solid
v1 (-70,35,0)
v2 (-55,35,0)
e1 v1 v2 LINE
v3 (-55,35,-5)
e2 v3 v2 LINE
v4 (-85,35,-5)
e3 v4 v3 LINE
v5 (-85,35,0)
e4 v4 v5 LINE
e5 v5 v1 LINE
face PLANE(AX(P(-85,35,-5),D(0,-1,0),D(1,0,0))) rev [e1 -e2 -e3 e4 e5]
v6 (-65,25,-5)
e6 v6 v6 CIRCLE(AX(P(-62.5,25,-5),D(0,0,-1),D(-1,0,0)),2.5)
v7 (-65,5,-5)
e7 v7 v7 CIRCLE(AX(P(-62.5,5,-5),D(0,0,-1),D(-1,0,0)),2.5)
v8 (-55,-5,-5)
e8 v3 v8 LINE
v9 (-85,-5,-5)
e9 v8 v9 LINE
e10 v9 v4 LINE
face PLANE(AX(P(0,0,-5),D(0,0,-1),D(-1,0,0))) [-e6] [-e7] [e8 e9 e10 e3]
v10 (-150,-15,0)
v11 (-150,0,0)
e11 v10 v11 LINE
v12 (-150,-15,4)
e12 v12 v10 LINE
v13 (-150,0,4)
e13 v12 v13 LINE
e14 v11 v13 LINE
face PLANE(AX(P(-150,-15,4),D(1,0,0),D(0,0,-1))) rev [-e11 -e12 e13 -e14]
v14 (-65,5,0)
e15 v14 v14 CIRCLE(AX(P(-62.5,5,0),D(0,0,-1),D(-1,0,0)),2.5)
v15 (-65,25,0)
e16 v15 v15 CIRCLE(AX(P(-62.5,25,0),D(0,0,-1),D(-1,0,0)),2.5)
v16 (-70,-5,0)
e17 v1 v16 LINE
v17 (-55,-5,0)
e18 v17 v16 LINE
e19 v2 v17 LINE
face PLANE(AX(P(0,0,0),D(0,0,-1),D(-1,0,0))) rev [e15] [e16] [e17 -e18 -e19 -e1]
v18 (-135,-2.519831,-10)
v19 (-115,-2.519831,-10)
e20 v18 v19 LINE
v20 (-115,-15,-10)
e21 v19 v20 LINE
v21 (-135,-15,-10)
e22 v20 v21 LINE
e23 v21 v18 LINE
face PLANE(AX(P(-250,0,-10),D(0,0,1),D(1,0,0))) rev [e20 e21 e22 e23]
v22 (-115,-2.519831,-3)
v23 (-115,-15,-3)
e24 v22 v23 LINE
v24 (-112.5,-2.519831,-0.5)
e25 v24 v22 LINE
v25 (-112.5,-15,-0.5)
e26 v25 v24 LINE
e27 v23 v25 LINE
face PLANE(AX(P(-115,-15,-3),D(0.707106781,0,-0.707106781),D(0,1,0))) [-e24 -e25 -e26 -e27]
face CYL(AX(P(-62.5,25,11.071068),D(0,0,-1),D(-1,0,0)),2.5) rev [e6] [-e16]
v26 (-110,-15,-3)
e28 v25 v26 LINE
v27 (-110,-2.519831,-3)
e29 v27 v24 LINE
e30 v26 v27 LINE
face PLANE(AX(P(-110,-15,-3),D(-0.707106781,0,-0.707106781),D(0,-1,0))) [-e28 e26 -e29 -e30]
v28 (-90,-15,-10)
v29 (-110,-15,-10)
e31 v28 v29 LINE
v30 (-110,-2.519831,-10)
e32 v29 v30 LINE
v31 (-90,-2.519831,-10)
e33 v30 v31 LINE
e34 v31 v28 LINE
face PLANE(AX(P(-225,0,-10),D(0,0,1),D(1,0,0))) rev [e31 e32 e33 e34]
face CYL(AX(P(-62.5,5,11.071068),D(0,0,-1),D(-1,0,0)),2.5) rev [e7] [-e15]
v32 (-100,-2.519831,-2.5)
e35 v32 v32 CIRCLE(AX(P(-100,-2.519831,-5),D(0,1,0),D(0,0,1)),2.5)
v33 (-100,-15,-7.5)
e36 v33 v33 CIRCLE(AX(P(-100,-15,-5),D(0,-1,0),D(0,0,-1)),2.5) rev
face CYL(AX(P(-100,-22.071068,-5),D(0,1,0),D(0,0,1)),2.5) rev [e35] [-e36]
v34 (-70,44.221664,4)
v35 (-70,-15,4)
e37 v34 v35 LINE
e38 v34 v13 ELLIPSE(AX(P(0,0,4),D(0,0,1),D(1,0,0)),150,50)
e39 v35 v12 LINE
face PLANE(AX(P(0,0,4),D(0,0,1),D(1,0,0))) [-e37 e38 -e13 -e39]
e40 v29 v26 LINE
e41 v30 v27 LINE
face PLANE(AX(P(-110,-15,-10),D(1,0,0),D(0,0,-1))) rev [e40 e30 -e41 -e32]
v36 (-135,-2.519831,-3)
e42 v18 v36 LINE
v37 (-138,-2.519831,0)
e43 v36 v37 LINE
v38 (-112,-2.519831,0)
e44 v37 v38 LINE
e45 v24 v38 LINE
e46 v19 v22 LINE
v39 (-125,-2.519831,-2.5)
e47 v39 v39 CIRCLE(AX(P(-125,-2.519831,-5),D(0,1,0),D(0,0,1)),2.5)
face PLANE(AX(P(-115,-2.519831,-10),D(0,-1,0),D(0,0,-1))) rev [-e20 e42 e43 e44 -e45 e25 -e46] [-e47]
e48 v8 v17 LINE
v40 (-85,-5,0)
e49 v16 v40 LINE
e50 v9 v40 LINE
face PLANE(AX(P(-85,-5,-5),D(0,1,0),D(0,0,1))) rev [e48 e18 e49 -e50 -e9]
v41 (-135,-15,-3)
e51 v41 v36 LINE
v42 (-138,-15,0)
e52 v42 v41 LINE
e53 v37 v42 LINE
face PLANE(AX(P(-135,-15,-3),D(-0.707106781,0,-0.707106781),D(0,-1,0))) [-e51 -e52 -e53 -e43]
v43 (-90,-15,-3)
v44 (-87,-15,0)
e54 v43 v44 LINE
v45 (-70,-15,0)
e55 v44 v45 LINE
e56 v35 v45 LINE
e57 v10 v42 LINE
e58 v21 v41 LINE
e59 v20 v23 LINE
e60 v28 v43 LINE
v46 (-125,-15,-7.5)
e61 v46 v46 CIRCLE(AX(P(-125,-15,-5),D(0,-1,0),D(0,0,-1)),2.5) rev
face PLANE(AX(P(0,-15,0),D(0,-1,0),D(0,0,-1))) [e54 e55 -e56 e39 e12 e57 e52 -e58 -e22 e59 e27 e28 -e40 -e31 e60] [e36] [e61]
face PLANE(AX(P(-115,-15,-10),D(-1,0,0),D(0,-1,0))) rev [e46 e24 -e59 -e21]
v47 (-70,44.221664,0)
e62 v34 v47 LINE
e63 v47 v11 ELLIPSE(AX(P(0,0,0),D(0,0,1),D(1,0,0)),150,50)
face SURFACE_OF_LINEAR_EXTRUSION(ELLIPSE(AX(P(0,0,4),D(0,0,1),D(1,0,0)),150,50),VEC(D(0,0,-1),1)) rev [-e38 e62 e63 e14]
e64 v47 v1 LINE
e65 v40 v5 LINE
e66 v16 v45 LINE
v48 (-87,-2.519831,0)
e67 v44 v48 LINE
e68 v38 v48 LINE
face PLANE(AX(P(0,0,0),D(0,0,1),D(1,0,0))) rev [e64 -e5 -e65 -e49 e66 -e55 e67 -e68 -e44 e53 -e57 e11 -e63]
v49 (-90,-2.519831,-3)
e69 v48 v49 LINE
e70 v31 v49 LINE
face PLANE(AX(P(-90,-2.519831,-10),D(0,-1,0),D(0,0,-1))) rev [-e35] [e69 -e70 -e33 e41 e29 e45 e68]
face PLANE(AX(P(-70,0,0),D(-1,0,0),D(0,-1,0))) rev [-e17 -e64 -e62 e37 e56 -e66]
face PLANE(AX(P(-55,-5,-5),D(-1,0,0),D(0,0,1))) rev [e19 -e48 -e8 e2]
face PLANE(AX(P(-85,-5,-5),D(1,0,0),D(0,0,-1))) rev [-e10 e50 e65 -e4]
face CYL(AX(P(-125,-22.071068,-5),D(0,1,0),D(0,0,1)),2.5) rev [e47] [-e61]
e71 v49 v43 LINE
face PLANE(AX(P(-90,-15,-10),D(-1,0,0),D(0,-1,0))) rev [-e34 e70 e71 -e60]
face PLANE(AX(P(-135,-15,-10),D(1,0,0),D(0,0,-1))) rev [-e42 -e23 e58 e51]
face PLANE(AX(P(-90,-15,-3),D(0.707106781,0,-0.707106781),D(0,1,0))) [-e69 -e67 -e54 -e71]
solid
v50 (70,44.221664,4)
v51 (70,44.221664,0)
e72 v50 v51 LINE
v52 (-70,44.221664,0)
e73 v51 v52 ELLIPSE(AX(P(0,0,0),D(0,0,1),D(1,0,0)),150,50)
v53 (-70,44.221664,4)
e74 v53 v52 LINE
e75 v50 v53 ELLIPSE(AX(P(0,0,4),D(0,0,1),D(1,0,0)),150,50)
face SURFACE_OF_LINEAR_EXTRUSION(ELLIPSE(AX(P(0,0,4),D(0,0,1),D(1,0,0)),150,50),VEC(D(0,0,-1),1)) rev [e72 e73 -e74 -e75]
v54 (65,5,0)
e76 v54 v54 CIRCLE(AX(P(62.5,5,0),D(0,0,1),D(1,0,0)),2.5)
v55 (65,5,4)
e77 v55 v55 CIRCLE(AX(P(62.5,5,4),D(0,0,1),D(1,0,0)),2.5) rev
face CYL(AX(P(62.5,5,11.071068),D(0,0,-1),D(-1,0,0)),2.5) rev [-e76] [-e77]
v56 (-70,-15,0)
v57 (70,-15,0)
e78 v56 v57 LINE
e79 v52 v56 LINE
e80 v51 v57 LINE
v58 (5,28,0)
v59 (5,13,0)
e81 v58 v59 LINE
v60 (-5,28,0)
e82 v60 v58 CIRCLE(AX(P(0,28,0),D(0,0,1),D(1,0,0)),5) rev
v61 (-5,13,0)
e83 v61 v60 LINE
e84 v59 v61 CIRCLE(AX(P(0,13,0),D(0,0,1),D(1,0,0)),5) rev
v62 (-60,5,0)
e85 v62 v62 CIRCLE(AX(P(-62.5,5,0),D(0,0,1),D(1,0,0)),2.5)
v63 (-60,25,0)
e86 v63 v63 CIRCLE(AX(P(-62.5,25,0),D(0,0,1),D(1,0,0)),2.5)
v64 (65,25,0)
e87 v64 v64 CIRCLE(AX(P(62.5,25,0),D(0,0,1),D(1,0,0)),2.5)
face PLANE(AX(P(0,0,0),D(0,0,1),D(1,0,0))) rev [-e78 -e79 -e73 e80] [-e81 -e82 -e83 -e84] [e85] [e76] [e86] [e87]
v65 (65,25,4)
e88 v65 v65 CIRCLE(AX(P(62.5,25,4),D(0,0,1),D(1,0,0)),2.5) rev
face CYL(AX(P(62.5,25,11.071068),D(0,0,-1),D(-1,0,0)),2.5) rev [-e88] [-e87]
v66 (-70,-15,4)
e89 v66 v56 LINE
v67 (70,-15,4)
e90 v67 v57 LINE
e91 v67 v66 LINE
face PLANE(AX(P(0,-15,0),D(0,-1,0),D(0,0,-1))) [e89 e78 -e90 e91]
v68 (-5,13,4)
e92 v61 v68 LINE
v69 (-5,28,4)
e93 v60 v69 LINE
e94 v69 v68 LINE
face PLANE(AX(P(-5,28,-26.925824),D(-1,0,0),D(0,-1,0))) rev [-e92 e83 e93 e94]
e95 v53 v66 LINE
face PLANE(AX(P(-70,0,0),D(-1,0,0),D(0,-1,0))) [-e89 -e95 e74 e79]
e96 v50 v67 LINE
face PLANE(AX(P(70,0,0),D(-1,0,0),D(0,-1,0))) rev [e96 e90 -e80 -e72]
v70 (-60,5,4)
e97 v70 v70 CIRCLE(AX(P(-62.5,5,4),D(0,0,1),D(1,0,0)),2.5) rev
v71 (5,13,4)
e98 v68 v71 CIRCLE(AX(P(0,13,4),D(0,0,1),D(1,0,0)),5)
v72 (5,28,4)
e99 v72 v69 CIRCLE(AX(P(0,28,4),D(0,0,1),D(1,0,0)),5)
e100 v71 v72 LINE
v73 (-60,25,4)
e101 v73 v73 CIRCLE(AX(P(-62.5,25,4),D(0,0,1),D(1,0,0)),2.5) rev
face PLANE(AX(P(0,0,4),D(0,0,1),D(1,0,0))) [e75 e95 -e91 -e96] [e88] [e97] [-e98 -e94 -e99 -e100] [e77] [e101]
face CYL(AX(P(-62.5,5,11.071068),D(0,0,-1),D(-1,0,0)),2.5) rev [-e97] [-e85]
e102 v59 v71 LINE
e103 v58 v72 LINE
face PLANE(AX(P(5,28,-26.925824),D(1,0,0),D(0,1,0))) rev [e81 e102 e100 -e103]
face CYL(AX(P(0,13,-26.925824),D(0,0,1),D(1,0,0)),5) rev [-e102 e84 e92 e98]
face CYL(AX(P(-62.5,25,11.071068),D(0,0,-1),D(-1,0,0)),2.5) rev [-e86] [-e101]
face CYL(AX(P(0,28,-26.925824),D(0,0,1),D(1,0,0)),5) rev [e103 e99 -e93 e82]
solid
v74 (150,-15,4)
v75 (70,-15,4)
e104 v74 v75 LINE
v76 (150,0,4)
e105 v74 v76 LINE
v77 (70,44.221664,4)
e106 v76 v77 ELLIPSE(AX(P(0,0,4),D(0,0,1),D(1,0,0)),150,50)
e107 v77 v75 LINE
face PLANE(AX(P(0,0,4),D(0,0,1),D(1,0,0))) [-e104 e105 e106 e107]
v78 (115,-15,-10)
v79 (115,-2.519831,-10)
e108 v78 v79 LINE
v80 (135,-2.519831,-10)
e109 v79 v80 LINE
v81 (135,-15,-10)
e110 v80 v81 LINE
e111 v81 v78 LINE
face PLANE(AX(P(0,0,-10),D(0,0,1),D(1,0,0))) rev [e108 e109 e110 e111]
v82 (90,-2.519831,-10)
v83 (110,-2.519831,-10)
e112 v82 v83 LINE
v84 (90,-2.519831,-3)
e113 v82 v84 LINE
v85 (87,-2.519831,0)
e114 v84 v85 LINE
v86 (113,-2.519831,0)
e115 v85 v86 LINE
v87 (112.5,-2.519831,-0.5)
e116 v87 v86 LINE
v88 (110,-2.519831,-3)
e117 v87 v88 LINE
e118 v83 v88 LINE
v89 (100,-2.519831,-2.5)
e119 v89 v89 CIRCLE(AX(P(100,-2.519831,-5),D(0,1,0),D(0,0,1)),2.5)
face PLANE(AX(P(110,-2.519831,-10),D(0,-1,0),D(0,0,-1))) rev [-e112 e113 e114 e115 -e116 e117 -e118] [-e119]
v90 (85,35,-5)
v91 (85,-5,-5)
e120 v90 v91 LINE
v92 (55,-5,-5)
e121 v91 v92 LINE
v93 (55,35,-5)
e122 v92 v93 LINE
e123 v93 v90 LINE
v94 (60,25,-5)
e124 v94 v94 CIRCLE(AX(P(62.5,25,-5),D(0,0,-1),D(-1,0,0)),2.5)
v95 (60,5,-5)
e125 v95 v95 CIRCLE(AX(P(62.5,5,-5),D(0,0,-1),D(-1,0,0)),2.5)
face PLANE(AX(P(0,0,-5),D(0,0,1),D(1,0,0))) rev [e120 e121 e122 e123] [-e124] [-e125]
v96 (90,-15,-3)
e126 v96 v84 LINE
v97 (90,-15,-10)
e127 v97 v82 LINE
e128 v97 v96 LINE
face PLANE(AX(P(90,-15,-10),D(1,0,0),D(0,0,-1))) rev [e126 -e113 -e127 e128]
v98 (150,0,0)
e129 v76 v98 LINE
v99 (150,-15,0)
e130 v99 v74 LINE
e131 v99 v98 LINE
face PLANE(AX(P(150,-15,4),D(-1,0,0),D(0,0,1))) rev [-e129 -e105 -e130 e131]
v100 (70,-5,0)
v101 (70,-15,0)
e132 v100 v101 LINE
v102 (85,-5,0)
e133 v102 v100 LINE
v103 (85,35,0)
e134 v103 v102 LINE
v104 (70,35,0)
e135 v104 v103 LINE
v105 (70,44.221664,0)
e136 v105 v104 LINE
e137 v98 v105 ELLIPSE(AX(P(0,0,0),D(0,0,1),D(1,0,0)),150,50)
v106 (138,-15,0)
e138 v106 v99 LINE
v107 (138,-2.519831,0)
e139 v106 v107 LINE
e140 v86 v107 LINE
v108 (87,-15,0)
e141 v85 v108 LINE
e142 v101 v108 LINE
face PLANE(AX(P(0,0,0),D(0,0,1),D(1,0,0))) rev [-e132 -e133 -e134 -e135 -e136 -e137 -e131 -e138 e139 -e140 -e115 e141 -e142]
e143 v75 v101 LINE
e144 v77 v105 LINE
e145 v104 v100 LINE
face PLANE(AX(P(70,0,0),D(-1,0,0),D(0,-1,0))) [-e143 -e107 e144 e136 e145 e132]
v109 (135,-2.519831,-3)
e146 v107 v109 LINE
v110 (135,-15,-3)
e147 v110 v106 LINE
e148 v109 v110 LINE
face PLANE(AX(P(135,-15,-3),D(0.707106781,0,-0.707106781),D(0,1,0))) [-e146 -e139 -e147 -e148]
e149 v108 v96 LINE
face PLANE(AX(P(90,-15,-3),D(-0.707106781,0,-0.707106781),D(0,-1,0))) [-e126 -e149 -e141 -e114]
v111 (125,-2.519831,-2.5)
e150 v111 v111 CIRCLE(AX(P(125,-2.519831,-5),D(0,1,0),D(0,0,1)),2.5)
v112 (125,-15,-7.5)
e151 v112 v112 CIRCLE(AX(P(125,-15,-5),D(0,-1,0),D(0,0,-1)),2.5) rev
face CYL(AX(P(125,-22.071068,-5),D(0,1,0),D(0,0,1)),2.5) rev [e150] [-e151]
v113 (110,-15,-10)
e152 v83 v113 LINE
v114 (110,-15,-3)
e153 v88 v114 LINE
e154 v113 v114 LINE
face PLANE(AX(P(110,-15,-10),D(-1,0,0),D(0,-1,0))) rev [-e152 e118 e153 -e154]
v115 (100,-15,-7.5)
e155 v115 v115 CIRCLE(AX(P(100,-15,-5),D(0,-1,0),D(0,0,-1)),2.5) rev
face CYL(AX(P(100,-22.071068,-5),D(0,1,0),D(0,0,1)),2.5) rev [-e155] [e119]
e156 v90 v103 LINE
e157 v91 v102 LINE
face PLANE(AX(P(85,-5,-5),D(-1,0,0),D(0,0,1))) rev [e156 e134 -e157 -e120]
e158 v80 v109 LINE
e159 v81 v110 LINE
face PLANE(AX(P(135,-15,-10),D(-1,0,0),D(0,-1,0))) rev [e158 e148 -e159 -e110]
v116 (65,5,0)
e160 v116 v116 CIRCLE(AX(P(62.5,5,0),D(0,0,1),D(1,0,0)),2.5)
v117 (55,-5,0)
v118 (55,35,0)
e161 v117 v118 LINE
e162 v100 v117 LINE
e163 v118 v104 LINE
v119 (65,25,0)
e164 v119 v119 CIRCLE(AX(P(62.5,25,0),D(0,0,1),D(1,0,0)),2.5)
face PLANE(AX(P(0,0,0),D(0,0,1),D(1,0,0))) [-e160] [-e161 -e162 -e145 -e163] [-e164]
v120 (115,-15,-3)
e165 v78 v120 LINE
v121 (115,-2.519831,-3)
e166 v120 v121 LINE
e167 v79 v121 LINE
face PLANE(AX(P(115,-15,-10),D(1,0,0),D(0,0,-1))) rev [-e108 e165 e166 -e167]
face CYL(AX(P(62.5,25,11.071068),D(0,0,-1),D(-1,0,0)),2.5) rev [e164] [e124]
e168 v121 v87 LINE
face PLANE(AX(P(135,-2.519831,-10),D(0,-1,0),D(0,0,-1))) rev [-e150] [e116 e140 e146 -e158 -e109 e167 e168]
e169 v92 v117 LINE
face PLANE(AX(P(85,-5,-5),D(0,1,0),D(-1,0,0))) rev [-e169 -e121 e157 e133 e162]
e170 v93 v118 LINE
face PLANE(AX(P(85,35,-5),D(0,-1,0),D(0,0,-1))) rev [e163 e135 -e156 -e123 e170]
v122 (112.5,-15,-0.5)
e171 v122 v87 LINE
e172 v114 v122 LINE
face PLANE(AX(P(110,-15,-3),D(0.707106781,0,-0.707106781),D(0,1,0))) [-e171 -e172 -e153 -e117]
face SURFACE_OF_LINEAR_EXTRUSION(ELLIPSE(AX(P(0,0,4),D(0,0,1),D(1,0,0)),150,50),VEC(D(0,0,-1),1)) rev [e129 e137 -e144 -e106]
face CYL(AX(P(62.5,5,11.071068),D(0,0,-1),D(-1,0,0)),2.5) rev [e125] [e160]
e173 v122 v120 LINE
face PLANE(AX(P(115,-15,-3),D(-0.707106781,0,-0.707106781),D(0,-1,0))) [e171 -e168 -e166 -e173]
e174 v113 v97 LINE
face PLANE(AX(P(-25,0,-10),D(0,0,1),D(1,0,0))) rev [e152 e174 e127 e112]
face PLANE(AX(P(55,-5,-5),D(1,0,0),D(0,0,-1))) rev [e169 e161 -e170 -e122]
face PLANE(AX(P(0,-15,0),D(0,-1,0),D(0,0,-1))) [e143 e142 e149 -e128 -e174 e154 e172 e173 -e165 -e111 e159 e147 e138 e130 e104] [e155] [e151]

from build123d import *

# Parameters (mm, degrees)
ESQUISSE1_RX                   = 150
ESQUISSE1_RY                   = 50
BOSS_EXTRU_2_DEPTH             = 4
ESQUISSE2_W                    = 328.393114187
ESQUISSE2_H                    = 54.583456932
ENL_V_MAT_EXTRU_1_DEPTH        = 4
ENL_V_MAT_EXTRU_2_DEPTH        = 4
ESQUISSE5_W                    = 300
ESQUISSE5_H                    = 4
BOSS_EXTRU_3_DEPTH             = 15
ESQUISSE8_W                    = 20
ESQUISSE8_H                    = 12.480168935
BOSS_EXTRU_5_DEPTH             = 10
ESQUISSE9_R                    = 2.5
ENL_V_MAT_EXTRU_4_DEPTH        = 12.480168935
CHANFREIN1_SIZE                = 3
R_P_TITION_START               = -15
R_P_TITION_LIN_AIRE2_OUTLINE_R = 2.5
R_P_TITION_LIN_AIRE2_DEPTH     = 12.480168935
R_P_TITION_LIN_AIRE3_OUTLINE_R = 2.5
R_P_TITION_LIN_AIRE3_DEPTH     = 12.480168935
ESQUISSE15_W                   = 30
ESQUISSE15_H                   = 40
BOSS_EXTRU_7_DEPTH             = 5
BOSS_EXTRU_7_2_DEPTH           = 5
ENL_V_START                    = -9
ESQUISSE16_R                   = 2.5
ENL_V_MAT_EXTRU_7_DEPTH        = 9
FRACTIONNER2_START             = -150
FRACTIONNER2_DEPTH             = 80
FRACTIONNER2_START_2           = 70
FRACTIONNER2_2_DEPTH           = 80
FRACTIONNER2_START_3           = -15
FRACTIONNER2_3_OUTLINE_R       = 2.5
FRACTIONNER2_3_DEPTH           = 12.480168935
FRACTIONNER2_START_4           = -2.519831065
FRACTIONNER2_4_OUTLINE_W       = 80
FRACTIONNER2_4_OUTLINE_H       = 4
FRACTIONNER2_4_DEPTH           = 2.519831065
FRACTIONNER2_5_DEPTH           = 4
FRACTIONNER2_6_OUTLINE_R       = 2.5
FRACTIONNER2_6_DEPTH           = 12.480168935
FRACTIONNER2_7_OUTLINE_W       = 80
FRACTIONNER2_7_OUTLINE_H       = 4
FRACTIONNER2_7_DEPTH           = 2.519831065
FRACTIONNER2_8_DEPTH           = 4


with BuildPart() as part:
    # Esquisse1 → Boss.-Extru.2 (new body)
    with BuildSketch(Plane.XY):
        with Locations((0, 0)):
            Ellipse(ESQUISSE1_RX, ESQUISSE1_RY)
    extrude(amount=BOSS_EXTRU_2_DEPTH)

    # Esquisse2 → Enlèv. mat.-Extru.1 (cut)
    with BuildSketch(Plane.XY.offset(4)):
        with Locations((5.354235558, -27.291728466)):
            Rectangle(ESQUISSE2_W, ESQUISSE2_H)
    extrude(amount=-ENL_V_MAT_EXTRU_1_DEPTH, mode=Mode.SUBTRACT)

    # Esquisse3 → Enlèv. mat.-Extru.2 (cut)
    with BuildSketch(Plane.XY.offset(4)):
        with BuildLine():
            Line((5, 28), (5, 13))
            ThreePointArc((5, 13), (0, 8), (-5, 13))
            Line((-5, 13), (-5, 28))
            ThreePointArc((-5, 28), (0, 33), (5, 28))
        make_face()
    extrude(amount=-ENL_V_MAT_EXTRU_2_DEPTH, mode=Mode.SUBTRACT)

    # Esquisse5 → Boss.-Extru.3 (add)
    with BuildSketch(Plane.XZ):
        with Locations((0, 2)):
            Rectangle(ESQUISSE5_W, ESQUISSE5_H)
    extrude(amount=BOSS_EXTRU_3_DEPTH)

    # Esquisse8 → Boss.-Extru.5 (add)
    with BuildSketch(Plane(origin=(0, 0, 0), x_dir=(-1, 0, 0), z_dir=(0, 0, -1))):
        with Locations((-125, -8.759915533)):
            Rectangle(ESQUISSE8_W, ESQUISSE8_H)
    extrude(amount=BOSS_EXTRU_5_DEPTH)

    # Esquisse9 → Enlèv. mat.-Extru.4 (cut)
    with BuildSketch(Plane(origin=(0, -2.519831065, 0), x_dir=(1, 0, 0), z_dir=(0, 1, 0))):
        with Locations(Location((125, 5, 0), (0, 0, 270))):
            Circle(ESQUISSE9_R)
    extrude(amount=-ENL_V_MAT_EXTRU_4_DEPTH, mode=Mode.SUBTRACT)

    # Chanfrein1
    chanfrein1_edges = [part.edges().sort_by_distance(p)[0] for p in [
        (135, -8.759915532, 0),
        (115, -8.759915532, 0),
    ]]
    chamfer(chanfrein1_edges, length=CHANFREIN1_SIZE)

    # Répétition linéaire2: read off the stored shape, not the designer's step
    # Répétition linéaire2 outline → Répétition linéaire2 (add)
    with BuildSketch(Plane(origin=(0, 0, 0), x_dir=(1, 0, 0), z_dir=(0, 1, 0)).offset(R_P_TITION_START)):
        Polygon((110, 10), (90, 10), (90, 3), (87, 0), (112, 0), (112.5, 0.5), (110, 3), align=None)
        with Locations((100, 5)):
            Circle(R_P_TITION_LIN_AIRE2_OUTLINE_R, mode=Mode.SUBTRACT)
    extrude(amount=R_P_TITION_LIN_AIRE2_DEPTH)

    # Répétition linéaire3: read off the stored shape, not the designer's step
    # Répétition linéaire3 outline → Répétition linéaire3 (add)
    with BuildSketch(Plane(origin=(0, 0, 0), x_dir=(1, 0, 0), z_dir=(0, 1, 0)).offset(R_P_TITION_START)):
        Polygon((-90, 10), (-110, 10), (-110, 3), (-112.5, 0.5), (-115, 3), (-115, 10), (-135, 10), (-135, 3), (-138, 0), (-87, 0), (-90, 3), align=None)
        with Locations((-125, 5)):
            Circle(R_P_TITION_LIN_AIRE3_OUTLINE_R, mode=Mode.SUBTRACT)
        with Locations((-100, 5)):
            Circle(R_P_TITION_LIN_AIRE3_OUTLINE_R, mode=Mode.SUBTRACT)
    extrude(amount=R_P_TITION_LIN_AIRE3_DEPTH)


with BuildPart() as body_2:
    # Esquisse15 → Boss.-Extru.7 (new body)
    with BuildSketch(Plane(origin=(0, 0, 0), x_dir=(-1, 0, 0), z_dir=(0, 0, -1))):
        with Locations((-70, 15)):
            Rectangle(ESQUISSE15_W, ESQUISSE15_H)
    extrude(amount=BOSS_EXTRU_7_DEPTH)


with BuildPart() as body_3:
    # Esquisse15 → Boss.-Extru.7 2 (new body)
    with BuildSketch(Plane(origin=(0, 0, 0), x_dir=(-1, 0, 0), z_dir=(0, 0, -1))):
        with Locations((70, 15)):
            Rectangle(ESQUISSE15_W, ESQUISSE15_H)
    extrude(amount=BOSS_EXTRU_7_2_DEPTH)


with BuildPart() as enl_v_mat_extru_7_tool:
    # Esquisse16 → Enlèv. mat.-Extru.7 (new body)
    with BuildSketch(Plane(origin=(0, 0, -5), x_dir=(-1, 0, 0), z_dir=(0, 0, -1)).offset(ENL_V_START)):
        with Locations((-62.5, 25)):
            Circle(ESQUISSE16_R)
        with Locations((62.5, 25)):
            Circle(ESQUISSE16_R)
        with Locations((-62.5, 5)):
            Circle(ESQUISSE16_R)
        with Locations((62.5, 5)):
            Circle(ESQUISSE16_R)
    extrude(amount=ENL_V_MAT_EXTRU_7_DEPTH)


with BuildPart() as part_1:
    add(part.part)

    # Enlèv. mat.-Extru.7: cut by enl_v_mat_extru_7_tool
    add(enl_v_mat_extru_7_tool.part, mode=Mode.SUBTRACT)

    # Fractionner2: read off the stored shape, not the designer's step
    # Fractionner2 outline → Fractionner2 (cut)
    with BuildSketch(Plane.YZ.offset(FRACTIONNER2_START)):
        Polygon((-2.519831065, -10), (-2.519831065, 0), (46, 0), (46, 4), (-15, 4), (-15, -10), align=None)
    extrude(amount=FRACTIONNER2_DEPTH, mode=Mode.SUBTRACT)

    # Fractionner2 2 outline → Fractionner2 2 (cut)
    with BuildSketch(Plane.YZ.offset(FRACTIONNER2_START_2)):
        Polygon((-2.519831065, -10), (-2.519831065, 0), (46, 0), (46, 4), (-15, 4), (-15, -10), align=None)
    extrude(amount=FRACTIONNER2_2_DEPTH, mode=Mode.SUBTRACT)


with BuildPart() as body_2_1:
    add(body_2.part)

    # Enlèv. mat.-Extru.7: cut by enl_v_mat_extru_7_tool
    add(enl_v_mat_extru_7_tool.part, mode=Mode.SUBTRACT)


with BuildPart() as body_3_1:
    add(body_3.part)

    # Enlèv. mat.-Extru.7: cut by enl_v_mat_extru_7_tool
    add(enl_v_mat_extru_7_tool.part, mode=Mode.SUBTRACT)


with BuildPart() as body_4:
    # Fractionner2 3 outline → Fractionner2 3 (new body)
    with BuildSketch(Plane(origin=(0, 0, 0), x_dir=(1, 0, 0), z_dir=(0, 1, 0)).offset(FRACTIONNER2_START_3)):
        Polygon((-70, -4), (-70, 0), (-87, 0), (-90, 3), (-90, 10), (-110, 10), (-110, 3), (-112.5, 0.5), (-115, 3), (-115, 10), (-135, 10), (-135, 3), (-138, 0), (-150, 0), (-150, -4), align=None)
        with Locations((-100, 5)):
            Circle(FRACTIONNER2_3_OUTLINE_R, mode=Mode.SUBTRACT)
        with Locations((-125, 5)):
            Circle(FRACTIONNER2_3_OUTLINE_R, mode=Mode.SUBTRACT)
    extrude(amount=FRACTIONNER2_3_DEPTH)

    # Fractionner2 4 outline → Fractionner2 4 (add)
    with BuildSketch(Plane(origin=(0, 0, 0), x_dir=(1, 0, 0), z_dir=(0, 1, 0)).offset(FRACTIONNER2_START_4)):
        with Locations((-110, -2)):
            Rectangle(FRACTIONNER2_4_OUTLINE_W, FRACTIONNER2_4_OUTLINE_H)
    extrude(amount=FRACTIONNER2_4_DEPTH)

    # Fractionner2 5 outline → Fractionner2 5 (add)
    with BuildSketch(Plane.XY):
        with BuildLine():
            Line((-70, 0), (-70, 44.221663871))
            add(Edge.make_bspline(
                [(-70, 44.221663871), (-150, 30.151134458), (-150, 0)],
                knots=[2.056314449, 2.056314449, 2.056314449, 3.141592654, 3.141592654, 3.141592654], degree=2, weights=[1, 0.856348839, 1]))
            Line((-150, 0), (-70, 0))
        make_face()
    extrude(amount=FRACTIONNER2_5_DEPTH)

    # Fractionner3: read off the stored shape, not the designer's step
    # Fractionner3: union body 3
    add(body_3_1.part)


with BuildPart() as body_5:
    # Fractionner2 6 outline → Fractionner2 6 (new body)
    with BuildSketch(Plane(origin=(0, 0, 0), x_dir=(1, 0, 0), z_dir=(0, 1, 0)).offset(FRACTIONNER2_START_3)):
        Polygon((87, 0), (70, 0), (70, -4), (150, -4), (150, 0), (138, 0), (135, 3), (135, 10), (115, 10), (115, 3), (112.5, 0.5), (110, 3), (110, 10), (90, 10), (90, 3), align=None)
        with Locations((125, 5)):
            Circle(FRACTIONNER2_6_OUTLINE_R, mode=Mode.SUBTRACT)
        with Locations((100, 5)):
            Circle(FRACTIONNER2_6_OUTLINE_R, mode=Mode.SUBTRACT)
    extrude(amount=FRACTIONNER2_6_DEPTH)

    # Fractionner2 7 outline → Fractionner2 7 (add)
    with BuildSketch(Plane(origin=(0, 0, 0), x_dir=(1, 0, 0), z_dir=(0, 1, 0)).offset(FRACTIONNER2_START_4)):
        with Locations((110, -2)):
            Rectangle(FRACTIONNER2_7_OUTLINE_W, FRACTIONNER2_7_OUTLINE_H)
    extrude(amount=FRACTIONNER2_7_DEPTH)

    # Fractionner2 8 outline → Fractionner2 8 (add)
    with BuildSketch(Plane.XY):
        with BuildLine():
            Line((70, 0), (150, 0))
            add(Edge.make_bspline(
                [(150, 0), (150, 30.151134458), (70, 44.221663871)],
                knots=[0, 0, 0, 1.085278204, 1.085278204, 1.085278204], degree=2, weights=[1, 0.856348839, 1]))
            Line((70, 44.221663871), (70, 0))
        make_face()
    extrude(amount=FRACTIONNER2_8_DEPTH)


with BuildPart() as body_2_2:
    add(body_2_1.part)

    # Combiner3: union body 5
    add(body_5.part)


solid = Compound([part_1.part, body_4.part, body_2_2.part])
